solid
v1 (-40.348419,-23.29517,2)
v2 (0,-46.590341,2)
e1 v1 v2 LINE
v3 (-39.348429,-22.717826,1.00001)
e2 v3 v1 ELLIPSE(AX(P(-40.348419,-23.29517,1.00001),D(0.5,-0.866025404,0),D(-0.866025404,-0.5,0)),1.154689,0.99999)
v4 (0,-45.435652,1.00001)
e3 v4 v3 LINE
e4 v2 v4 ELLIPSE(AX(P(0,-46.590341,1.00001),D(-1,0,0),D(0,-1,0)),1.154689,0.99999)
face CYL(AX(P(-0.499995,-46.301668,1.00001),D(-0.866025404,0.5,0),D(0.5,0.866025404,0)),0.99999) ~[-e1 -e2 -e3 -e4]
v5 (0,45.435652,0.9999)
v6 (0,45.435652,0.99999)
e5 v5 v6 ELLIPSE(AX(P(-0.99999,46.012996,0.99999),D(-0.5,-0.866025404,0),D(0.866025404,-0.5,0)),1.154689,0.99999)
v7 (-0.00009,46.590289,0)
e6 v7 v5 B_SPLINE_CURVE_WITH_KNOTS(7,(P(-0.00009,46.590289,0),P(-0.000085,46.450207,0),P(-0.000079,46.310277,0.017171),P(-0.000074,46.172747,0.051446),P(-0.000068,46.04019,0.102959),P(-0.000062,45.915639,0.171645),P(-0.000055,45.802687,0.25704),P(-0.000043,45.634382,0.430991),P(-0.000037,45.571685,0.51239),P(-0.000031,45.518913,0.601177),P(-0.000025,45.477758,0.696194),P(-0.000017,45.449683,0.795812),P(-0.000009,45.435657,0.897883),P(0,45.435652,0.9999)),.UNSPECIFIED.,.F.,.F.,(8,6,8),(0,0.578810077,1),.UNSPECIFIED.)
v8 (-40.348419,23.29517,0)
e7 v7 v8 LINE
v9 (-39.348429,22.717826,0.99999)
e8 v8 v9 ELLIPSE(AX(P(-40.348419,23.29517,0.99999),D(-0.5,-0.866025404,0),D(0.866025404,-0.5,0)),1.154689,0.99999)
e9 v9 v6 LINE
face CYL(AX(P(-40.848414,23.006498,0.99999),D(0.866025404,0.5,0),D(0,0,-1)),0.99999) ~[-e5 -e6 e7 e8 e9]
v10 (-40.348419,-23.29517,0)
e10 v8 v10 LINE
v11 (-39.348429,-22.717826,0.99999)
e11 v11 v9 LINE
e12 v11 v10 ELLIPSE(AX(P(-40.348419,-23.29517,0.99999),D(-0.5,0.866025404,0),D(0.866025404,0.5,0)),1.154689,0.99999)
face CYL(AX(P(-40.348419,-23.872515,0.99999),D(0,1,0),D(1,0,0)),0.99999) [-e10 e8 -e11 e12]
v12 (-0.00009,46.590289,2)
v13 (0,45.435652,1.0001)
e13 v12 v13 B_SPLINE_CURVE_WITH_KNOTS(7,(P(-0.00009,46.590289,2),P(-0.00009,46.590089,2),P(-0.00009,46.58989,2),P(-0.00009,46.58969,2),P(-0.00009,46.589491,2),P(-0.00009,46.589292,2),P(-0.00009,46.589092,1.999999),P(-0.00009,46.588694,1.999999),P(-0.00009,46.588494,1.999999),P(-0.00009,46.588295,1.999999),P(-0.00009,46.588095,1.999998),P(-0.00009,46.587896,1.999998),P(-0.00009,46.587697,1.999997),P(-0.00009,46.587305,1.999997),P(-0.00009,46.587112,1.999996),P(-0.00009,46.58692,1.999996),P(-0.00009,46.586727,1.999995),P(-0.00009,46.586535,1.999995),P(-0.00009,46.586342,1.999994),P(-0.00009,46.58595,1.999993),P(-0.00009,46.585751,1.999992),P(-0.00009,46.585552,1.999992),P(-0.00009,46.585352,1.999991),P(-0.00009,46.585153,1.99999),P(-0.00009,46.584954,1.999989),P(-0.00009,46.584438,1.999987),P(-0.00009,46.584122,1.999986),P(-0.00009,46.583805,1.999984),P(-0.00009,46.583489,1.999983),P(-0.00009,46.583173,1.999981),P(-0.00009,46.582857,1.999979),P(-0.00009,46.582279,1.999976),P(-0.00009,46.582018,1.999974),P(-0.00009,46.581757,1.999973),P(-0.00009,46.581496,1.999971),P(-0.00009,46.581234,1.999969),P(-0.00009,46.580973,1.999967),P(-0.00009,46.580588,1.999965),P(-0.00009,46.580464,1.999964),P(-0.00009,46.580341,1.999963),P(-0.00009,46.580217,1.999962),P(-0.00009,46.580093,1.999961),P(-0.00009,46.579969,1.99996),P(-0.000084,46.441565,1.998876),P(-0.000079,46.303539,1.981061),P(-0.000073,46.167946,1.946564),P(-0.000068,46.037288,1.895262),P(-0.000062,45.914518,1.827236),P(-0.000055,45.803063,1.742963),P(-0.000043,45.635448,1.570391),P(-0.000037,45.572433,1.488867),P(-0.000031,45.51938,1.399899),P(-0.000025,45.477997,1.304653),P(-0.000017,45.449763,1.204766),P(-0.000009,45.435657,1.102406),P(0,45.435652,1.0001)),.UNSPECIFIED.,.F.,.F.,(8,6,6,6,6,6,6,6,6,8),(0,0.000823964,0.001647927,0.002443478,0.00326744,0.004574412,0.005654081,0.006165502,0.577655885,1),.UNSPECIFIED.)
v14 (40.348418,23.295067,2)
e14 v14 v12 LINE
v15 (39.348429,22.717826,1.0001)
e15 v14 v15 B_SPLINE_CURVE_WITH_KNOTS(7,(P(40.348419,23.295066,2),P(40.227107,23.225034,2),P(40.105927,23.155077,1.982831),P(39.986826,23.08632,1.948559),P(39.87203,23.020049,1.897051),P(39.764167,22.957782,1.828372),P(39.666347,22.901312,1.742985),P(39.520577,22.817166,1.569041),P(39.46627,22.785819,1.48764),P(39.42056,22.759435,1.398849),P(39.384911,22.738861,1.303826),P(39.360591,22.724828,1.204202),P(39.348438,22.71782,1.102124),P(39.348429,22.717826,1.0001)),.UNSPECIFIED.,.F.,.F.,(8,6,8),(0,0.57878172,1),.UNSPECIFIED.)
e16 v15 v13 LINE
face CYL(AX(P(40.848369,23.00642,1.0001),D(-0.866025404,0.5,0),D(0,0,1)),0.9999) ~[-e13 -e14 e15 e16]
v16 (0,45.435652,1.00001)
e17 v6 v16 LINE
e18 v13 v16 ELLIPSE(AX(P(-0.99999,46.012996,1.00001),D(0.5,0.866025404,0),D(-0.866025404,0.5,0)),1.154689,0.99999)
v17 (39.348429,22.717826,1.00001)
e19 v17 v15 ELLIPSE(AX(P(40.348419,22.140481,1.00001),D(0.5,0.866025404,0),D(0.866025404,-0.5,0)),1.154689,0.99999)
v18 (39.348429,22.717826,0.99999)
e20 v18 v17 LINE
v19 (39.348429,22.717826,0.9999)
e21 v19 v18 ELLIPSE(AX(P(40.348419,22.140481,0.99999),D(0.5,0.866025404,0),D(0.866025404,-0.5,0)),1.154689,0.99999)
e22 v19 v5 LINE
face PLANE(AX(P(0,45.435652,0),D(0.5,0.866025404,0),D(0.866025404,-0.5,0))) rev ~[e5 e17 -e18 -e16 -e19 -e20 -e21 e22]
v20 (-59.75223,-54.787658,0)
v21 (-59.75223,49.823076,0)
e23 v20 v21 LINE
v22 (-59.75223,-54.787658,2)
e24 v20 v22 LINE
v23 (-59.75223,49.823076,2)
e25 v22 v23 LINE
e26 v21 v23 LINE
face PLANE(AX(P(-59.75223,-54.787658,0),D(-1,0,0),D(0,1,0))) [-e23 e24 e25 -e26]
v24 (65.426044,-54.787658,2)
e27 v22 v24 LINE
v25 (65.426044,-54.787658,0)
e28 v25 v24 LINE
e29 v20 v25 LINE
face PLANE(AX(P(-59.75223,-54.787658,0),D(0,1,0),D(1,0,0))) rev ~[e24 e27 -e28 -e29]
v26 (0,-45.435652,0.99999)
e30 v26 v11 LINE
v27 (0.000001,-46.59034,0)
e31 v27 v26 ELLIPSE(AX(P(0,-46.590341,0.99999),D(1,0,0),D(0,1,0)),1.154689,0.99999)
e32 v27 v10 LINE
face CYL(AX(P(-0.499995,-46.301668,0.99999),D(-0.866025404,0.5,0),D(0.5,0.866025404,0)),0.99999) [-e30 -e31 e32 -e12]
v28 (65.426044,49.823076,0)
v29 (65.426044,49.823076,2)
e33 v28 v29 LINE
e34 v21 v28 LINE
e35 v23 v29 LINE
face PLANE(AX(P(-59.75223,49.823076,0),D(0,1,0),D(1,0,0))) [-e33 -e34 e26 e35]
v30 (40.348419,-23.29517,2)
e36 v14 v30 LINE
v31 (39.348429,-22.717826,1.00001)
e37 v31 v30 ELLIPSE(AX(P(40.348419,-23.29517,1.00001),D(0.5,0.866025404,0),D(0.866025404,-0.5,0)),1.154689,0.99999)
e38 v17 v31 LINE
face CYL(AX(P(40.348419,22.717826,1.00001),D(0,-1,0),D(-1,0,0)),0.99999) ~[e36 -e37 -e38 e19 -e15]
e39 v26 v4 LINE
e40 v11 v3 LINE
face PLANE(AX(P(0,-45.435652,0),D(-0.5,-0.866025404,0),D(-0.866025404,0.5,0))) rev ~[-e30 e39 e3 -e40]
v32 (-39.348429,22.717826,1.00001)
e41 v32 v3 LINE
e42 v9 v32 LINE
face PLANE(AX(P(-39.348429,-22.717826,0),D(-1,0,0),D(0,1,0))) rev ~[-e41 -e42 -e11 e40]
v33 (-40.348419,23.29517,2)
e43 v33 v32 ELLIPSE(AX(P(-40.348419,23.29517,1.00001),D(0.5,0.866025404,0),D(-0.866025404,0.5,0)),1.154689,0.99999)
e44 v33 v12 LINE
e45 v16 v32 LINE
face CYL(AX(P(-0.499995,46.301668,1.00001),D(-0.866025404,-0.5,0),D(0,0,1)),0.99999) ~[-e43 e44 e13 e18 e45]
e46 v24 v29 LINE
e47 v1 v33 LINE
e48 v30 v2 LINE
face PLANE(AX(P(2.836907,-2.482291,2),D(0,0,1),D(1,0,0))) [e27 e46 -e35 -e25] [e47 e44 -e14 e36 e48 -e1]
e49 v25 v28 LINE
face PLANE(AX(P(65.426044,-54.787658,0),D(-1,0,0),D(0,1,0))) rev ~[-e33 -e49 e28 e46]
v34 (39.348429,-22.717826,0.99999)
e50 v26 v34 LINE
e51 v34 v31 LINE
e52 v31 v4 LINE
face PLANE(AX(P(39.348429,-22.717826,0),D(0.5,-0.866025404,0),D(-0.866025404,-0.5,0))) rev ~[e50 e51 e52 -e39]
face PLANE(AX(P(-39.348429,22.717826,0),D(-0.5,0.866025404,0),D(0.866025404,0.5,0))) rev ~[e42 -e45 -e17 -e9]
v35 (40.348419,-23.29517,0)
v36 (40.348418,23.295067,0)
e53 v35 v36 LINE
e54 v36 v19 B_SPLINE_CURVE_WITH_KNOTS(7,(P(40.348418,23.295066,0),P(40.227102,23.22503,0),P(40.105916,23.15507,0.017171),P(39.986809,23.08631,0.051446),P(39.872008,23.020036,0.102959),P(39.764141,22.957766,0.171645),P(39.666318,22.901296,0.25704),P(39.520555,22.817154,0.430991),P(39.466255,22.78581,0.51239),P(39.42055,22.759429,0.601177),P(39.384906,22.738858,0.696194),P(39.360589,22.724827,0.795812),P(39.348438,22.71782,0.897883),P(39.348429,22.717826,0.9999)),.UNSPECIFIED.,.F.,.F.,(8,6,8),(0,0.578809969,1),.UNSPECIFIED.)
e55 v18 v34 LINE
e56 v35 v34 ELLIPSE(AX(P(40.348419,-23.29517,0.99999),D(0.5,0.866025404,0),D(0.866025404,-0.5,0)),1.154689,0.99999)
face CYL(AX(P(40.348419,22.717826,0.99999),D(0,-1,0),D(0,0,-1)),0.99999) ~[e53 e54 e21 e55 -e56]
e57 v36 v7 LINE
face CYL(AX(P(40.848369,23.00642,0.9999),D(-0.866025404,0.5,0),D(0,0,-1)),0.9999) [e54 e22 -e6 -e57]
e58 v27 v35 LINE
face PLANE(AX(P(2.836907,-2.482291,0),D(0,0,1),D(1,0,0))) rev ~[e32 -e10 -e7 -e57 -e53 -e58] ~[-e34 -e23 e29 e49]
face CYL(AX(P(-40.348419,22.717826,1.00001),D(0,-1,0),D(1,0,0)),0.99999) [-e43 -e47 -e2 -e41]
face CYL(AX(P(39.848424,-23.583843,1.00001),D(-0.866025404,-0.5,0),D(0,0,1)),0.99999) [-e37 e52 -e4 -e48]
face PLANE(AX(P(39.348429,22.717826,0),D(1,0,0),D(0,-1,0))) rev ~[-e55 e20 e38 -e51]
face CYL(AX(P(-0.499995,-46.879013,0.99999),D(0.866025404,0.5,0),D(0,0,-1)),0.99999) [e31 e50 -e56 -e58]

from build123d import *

# Parameters (mm, degrees)
F0_W     = 125.1782737672
F0_H     = 104.6107336879
F1_DEPTH = 2
F2_R     = 0.99999
F3_R     = 0.99999
F4_R     = 0.99999
F5_R     = 0.99999
F6_R     = 0.99999
F7_R     = 0.9999


# Not quite as in the source:
# - a fillet or chamfer is up to 0.001 mm smaller than in the source, because OpenCascade refuses the exact size


with BuildPart() as f1:
    # F0 (on Top) → F1 (new body)
    with BuildSketch(Plane.XY):
        with Locations((2.8369072825, -2.482291311)):
            Rectangle(F0_W, F0_H)
        Polygon((39.3484285011, 22.7178257873), (39.3484285011, -22.7178257873), (0, -45.4356515746), (-39.3484285011, -22.7178257873), (-39.3484285011, 22.7178257873), (0, 45.4356515746), align=None, mode=Mode.SUBTRACT)
    extrude(amount=F1_DEPTH)

    # F2 (radius 1 in the source; OpenCascade refuses exactly that, so slightly less here)
    f2_edges = [f1.edges().sort_by_distance(p)[0] for p in [
        (-19.674214, -34.076739, 2),
        (-19.674214, -34.076739, 0),
    ]]
    fillet(f2_edges, radius=F2_R)

    # F3 (radius 1 in the source; OpenCascade refuses exactly that, so slightly less here)
    f3_edges = [f1.edges().sort_by_distance(p)[0] for p in [
        (-39.348429, 0, 2),
        (-39.348429, 0, 0),
    ]]
    fillet(f3_edges, radius=F3_R)

    # F4 (radius 1 in the source; OpenCascade refuses exactly that, so slightly less here)
    f4_edges = [f1.edges().sort_by_distance(p)[0] for p in [
        (19.674214, -34.076739, 2),
        (19.674214, -34.076739, 0),
    ]]
    fillet(f4_edges, radius=F4_R)

    # F5 (radius 1 in the source; OpenCascade refuses exactly that, so slightly less here)
    f5_edges = [f1.edges().sort_by_distance(p)[0] for p in [
        (39.348429, 0, 2),
        (39.348429, 0, 0),
    ]]
    fillet(f5_edges, radius=F5_R)

    # F6 (radius 1 in the source; OpenCascade refuses exactly that, so slightly less here)
    f6_edges = [f1.edges().sort_by_distance(p)[0] for p in [
        (-19.674214, 34.076739, 2),
        (-19.674214, 34.076739, 0),
    ]]
    fillet(f6_edges, radius=F6_R)

    # F7 (radius 1 in the source; OpenCascade refuses exactly that, so slightly less here)
    f7_edges = [f1.edges().sort_by_distance(p)[0] for p in [
        (19.674214, 34.076739, 2),
        (19.674214, 34.076739, 0),
    ]]
    fillet(f7_edges, radius=F7_R)


solid = f1.part
